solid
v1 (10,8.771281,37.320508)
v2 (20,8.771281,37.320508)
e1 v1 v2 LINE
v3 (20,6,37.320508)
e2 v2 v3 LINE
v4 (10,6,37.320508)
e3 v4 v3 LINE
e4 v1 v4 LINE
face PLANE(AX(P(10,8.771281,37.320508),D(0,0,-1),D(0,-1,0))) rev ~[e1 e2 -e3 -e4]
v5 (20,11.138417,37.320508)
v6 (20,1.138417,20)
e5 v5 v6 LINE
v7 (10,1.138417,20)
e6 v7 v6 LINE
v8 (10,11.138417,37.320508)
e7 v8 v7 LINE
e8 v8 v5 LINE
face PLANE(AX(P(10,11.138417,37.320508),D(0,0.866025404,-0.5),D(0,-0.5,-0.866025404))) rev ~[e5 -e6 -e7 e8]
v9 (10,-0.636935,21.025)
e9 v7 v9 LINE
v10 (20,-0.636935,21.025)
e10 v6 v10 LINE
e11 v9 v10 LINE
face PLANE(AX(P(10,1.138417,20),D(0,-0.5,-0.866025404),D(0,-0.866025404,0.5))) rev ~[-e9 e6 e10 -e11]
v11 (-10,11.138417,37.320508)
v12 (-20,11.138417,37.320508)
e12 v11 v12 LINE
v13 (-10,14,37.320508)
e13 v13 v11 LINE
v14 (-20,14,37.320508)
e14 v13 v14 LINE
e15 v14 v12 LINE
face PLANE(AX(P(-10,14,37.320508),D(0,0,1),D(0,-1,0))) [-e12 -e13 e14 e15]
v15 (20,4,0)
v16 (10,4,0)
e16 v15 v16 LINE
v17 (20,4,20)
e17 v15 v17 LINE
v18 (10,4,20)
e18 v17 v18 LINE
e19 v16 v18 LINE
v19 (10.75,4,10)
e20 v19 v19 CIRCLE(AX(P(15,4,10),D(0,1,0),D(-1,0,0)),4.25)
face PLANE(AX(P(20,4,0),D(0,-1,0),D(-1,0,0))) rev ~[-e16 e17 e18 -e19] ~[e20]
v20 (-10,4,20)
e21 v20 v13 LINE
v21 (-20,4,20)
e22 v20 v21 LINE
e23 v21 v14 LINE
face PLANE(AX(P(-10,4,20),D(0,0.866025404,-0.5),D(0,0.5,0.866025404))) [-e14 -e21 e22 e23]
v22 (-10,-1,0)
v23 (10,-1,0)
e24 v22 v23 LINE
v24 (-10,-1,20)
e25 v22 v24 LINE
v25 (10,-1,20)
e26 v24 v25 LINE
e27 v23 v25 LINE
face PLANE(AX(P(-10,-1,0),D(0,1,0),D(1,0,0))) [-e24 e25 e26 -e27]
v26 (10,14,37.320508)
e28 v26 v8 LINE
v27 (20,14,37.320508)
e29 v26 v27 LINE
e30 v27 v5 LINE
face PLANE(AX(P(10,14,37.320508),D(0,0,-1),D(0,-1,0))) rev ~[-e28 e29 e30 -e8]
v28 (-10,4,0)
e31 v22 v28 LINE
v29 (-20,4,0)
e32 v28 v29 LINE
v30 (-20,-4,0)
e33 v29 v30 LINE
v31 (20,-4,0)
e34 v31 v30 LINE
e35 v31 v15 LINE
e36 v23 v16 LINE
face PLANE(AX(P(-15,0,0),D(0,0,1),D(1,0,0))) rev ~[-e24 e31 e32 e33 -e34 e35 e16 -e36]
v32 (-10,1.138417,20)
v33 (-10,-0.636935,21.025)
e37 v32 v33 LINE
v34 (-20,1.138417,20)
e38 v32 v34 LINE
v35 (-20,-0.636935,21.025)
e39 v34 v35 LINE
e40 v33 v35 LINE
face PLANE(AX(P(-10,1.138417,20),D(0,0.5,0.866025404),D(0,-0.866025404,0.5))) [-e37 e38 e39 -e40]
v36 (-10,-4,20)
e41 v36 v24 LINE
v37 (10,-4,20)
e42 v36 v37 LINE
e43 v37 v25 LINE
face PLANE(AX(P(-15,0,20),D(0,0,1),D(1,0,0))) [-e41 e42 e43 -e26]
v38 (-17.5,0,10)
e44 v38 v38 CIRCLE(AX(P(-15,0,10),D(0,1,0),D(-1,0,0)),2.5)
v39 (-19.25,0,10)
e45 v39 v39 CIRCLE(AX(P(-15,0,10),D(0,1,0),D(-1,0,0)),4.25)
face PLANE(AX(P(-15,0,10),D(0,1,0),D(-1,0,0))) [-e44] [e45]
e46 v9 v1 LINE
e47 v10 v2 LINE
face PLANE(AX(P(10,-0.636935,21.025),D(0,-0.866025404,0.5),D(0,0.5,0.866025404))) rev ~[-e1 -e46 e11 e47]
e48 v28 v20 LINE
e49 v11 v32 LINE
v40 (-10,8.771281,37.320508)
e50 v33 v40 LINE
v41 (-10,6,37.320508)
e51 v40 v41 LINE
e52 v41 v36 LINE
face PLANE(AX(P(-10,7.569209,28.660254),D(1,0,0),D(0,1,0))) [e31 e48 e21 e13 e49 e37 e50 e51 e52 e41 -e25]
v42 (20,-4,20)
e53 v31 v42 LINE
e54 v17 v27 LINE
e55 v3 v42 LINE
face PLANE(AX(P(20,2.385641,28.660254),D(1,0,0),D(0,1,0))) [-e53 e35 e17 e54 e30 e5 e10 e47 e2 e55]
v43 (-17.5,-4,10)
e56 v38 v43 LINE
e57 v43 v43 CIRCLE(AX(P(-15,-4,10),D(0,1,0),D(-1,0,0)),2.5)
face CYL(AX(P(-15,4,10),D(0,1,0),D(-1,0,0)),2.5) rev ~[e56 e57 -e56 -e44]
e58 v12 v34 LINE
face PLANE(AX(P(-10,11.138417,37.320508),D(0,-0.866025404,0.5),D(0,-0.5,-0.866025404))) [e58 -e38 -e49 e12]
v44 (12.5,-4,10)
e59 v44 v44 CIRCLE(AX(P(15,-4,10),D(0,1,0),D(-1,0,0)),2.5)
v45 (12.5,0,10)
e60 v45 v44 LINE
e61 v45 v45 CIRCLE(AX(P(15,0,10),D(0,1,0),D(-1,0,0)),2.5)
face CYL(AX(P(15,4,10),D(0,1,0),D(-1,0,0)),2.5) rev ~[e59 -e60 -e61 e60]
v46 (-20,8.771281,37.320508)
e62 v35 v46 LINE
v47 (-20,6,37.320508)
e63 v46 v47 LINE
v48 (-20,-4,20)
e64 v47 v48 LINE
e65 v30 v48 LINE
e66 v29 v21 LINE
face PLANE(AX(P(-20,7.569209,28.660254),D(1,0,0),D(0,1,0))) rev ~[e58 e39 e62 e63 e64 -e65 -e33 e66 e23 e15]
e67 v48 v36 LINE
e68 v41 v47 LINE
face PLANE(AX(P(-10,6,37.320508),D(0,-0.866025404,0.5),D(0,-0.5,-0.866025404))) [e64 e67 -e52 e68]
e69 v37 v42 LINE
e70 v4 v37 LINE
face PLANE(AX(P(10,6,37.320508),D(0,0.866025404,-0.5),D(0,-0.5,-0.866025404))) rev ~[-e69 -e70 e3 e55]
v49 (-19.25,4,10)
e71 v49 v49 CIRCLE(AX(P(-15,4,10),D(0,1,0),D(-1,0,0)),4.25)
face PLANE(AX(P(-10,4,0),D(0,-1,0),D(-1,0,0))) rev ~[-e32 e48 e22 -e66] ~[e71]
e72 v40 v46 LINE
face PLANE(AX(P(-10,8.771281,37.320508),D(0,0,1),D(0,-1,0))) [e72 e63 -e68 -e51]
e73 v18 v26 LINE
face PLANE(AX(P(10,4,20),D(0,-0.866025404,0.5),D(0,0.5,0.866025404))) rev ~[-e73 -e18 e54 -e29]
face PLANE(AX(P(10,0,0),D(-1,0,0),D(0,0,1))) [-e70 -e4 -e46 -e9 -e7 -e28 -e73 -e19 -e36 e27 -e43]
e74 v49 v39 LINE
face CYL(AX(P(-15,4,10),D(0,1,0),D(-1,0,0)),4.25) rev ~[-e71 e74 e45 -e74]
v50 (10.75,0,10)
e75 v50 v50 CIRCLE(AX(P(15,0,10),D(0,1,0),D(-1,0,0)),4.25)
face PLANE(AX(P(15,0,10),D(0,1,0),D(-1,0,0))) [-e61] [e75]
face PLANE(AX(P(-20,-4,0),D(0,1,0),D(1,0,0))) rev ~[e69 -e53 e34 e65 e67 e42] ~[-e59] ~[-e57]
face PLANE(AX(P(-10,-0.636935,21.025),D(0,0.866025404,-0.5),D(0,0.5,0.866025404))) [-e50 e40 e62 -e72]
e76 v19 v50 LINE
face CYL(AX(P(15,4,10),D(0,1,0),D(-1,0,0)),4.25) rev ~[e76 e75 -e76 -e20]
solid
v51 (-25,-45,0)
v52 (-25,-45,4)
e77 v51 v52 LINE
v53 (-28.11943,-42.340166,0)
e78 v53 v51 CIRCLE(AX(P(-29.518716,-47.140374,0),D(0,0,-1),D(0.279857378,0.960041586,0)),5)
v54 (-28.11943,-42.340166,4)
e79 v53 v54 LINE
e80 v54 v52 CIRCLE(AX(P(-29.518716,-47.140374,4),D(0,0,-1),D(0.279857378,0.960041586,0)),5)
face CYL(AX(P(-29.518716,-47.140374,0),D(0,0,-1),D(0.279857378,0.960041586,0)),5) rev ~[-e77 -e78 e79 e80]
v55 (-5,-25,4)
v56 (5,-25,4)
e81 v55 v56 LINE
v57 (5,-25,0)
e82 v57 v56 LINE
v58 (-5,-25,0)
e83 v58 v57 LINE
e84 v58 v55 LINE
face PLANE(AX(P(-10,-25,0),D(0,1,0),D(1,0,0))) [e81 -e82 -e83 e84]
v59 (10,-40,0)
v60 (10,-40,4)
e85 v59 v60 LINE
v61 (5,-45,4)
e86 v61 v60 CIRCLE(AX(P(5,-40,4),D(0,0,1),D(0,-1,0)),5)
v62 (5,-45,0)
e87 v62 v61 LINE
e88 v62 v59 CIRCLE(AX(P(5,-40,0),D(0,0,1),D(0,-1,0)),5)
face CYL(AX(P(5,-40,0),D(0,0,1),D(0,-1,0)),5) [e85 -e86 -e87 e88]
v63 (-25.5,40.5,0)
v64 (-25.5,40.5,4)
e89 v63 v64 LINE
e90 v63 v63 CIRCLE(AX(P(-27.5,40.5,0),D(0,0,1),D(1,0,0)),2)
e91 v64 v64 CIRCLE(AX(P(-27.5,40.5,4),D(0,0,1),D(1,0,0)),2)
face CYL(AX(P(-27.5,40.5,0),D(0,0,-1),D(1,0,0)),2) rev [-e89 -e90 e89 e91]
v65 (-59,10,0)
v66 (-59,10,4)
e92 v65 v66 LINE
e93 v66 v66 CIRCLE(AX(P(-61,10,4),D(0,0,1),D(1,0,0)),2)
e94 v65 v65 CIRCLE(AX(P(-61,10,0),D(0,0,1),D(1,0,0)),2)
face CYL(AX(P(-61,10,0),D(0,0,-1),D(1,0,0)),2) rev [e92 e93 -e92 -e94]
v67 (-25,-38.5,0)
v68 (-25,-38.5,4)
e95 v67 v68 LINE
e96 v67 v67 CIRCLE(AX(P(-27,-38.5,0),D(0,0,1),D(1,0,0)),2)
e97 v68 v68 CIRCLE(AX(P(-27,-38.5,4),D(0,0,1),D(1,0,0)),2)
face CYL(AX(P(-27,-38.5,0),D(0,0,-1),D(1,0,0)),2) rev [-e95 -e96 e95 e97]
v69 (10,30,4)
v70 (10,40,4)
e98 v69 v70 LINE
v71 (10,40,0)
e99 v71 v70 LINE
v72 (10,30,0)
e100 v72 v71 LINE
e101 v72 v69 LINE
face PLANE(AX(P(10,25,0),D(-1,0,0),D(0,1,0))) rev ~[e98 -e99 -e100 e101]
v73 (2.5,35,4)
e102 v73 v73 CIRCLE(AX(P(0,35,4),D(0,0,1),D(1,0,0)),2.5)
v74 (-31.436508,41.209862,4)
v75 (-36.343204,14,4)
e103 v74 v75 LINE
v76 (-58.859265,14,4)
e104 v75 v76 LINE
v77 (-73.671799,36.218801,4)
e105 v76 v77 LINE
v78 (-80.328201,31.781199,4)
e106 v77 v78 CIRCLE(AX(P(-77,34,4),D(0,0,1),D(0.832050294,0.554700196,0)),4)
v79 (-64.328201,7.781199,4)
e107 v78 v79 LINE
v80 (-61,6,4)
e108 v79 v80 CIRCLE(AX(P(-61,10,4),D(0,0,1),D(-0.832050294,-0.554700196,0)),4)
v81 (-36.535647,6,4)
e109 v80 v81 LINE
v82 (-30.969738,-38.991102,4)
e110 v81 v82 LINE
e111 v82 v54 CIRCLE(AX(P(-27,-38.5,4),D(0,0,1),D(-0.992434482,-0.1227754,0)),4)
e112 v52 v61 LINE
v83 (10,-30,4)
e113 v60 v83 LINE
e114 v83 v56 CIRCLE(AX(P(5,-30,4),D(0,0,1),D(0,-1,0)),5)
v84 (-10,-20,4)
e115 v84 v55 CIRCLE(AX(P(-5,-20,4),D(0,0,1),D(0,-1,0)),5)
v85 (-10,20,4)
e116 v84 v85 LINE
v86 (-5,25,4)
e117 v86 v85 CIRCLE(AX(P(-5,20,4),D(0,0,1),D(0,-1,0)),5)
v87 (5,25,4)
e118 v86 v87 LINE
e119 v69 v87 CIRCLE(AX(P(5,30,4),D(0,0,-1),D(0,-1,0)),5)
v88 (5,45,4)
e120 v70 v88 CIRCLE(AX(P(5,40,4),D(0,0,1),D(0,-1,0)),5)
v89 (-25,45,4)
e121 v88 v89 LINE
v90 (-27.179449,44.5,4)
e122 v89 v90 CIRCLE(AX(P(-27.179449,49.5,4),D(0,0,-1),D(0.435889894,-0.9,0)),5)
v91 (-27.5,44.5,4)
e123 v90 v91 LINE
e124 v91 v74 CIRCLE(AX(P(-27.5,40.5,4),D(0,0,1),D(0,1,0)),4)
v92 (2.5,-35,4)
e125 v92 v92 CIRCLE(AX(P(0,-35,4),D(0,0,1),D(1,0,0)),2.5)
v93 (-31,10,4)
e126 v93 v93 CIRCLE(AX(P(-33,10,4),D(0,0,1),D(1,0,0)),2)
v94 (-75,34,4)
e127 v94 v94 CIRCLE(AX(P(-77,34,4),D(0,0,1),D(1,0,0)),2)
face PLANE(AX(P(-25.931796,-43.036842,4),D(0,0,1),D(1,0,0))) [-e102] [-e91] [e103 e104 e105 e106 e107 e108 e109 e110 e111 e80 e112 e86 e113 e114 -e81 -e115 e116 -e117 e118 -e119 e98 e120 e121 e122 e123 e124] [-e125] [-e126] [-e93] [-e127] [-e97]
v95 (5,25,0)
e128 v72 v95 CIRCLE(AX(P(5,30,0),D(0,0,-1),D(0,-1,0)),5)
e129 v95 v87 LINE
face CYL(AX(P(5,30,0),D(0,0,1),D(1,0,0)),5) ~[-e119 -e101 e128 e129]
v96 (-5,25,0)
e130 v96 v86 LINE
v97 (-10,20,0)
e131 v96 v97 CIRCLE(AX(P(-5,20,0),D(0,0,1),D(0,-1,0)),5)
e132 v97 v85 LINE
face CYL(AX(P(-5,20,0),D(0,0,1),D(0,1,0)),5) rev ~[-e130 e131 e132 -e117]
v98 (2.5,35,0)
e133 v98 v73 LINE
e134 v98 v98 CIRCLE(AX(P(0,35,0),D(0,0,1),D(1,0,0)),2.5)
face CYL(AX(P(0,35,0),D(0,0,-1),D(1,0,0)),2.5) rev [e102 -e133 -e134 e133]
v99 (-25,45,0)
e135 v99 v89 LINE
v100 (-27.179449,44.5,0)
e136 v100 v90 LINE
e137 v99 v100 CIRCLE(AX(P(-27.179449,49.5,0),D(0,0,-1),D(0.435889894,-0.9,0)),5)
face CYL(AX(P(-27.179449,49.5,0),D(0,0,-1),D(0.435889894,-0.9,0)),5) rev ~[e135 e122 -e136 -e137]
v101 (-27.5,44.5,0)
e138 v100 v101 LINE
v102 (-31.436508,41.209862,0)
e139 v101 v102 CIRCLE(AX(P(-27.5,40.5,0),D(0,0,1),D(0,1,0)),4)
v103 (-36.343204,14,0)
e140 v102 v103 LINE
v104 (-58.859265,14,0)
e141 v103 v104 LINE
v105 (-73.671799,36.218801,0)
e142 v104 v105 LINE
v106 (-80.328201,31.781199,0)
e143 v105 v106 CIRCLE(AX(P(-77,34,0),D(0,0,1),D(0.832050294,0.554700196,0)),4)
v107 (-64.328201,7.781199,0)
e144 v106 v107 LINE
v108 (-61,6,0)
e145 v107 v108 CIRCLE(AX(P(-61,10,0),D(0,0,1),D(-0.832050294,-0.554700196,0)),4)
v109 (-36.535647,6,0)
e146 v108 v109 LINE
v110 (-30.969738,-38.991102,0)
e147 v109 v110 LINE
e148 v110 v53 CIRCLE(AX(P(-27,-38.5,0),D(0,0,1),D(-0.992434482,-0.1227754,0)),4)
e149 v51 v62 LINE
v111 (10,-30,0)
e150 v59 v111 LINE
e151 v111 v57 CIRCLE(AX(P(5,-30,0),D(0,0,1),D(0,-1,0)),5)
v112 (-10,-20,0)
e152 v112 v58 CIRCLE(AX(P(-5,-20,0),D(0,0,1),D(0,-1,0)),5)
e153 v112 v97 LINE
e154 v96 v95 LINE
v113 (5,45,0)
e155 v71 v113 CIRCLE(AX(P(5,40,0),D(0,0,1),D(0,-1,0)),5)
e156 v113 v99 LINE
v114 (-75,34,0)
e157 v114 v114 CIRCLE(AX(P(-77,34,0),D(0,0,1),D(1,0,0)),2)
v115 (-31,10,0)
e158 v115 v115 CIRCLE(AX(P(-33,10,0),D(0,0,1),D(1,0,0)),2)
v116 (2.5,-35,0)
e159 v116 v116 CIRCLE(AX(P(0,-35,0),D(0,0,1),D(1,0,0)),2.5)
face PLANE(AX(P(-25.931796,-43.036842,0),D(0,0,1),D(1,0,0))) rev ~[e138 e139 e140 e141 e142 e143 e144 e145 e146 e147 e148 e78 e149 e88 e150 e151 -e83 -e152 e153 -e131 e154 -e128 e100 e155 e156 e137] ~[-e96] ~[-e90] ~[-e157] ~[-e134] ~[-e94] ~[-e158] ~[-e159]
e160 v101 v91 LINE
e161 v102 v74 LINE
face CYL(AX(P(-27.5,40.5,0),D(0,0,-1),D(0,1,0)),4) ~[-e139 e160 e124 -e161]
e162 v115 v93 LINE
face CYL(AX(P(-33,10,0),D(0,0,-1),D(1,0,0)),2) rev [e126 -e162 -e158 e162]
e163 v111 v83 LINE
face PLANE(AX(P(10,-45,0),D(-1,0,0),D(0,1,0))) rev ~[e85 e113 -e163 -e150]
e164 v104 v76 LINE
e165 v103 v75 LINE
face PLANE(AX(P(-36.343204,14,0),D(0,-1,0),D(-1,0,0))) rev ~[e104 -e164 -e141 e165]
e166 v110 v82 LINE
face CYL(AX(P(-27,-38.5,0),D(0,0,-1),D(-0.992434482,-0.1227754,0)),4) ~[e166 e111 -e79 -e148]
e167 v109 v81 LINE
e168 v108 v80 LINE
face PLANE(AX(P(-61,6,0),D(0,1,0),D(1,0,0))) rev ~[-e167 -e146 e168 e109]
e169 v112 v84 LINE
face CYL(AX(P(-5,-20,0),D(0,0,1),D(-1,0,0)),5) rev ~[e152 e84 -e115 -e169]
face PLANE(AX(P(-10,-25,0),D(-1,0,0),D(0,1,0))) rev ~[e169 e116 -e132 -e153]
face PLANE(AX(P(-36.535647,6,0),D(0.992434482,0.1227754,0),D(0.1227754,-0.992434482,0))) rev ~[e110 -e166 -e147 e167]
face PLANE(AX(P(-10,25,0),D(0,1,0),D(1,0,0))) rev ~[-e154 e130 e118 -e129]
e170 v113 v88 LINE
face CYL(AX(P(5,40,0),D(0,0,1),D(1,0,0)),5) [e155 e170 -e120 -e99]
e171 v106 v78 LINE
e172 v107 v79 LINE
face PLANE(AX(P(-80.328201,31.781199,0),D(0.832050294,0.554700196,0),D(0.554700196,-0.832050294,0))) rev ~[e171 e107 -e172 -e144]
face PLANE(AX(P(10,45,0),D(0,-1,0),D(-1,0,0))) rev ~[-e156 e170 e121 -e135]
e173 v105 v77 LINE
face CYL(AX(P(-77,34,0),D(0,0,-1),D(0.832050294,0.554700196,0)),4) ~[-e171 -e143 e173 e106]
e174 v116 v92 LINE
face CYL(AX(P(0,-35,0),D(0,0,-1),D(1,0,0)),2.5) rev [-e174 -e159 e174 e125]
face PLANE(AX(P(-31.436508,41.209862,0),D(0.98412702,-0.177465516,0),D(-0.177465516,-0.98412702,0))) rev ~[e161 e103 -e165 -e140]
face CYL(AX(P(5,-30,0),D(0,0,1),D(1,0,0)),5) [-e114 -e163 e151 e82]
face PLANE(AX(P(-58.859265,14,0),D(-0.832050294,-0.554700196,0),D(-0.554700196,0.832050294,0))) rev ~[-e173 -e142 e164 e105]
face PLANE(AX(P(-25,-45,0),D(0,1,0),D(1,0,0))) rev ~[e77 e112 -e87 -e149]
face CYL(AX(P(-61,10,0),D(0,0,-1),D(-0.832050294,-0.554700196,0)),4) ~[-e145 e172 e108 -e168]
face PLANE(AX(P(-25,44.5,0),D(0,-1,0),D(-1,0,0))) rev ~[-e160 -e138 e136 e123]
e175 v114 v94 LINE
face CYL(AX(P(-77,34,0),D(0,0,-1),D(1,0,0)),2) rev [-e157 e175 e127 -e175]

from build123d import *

# Parameters (mm, degrees)
F0_W         = 20
F0_H         = 4
F1_DEPTH     = 20
F2_DEPTH     = 20
F4_START     = 10
F4_DEPTH     = 10
F5_START     = -10
F5_DEPTH     = 10
F6_R         = 2.5
F7_DEPTH     = 25
F6_R_2       = 4.25
F8_DEPTH     = 4
F9_DEPTH     = 1
F10_W        = 20
F10_H        = 20
F10_R        = 2.5
F10_R_2      = 2
F11_DEPTH    = 4
F12_T1_DEPTH = 4
F13_R        = 5


# Not quite as in the source:
# - a fillet or chamfer that OpenCascade refuses, or shapes differently, is made with other operations: its cross-section is extruded or revolved along the edge and cut away or added
# - ends of sketch curves that miss each other by under 0.0002 mm in the source are joined


with BuildPart() as f1:
    # F0 (on Top) → F1 (new body)
    with BuildSketch(Plane.XY):
        with Locations((0, -2)):
            Rectangle(F0_W, F0_H)
    extrude(amount=F1_DEPTH)

    # F0 (on Top) → F2 (join)
    with BuildSketch(Plane.XY):
        Polygon((-10, 4), (-20, 4), (-20, -4), (-10, -4), (-10, 0), align=None)
        Polygon((20, 4), (10, 4), (10, 0), (10, -4), (20, -4), align=None)
    extrude(amount=F2_DEPTH)

    # F3 (on Right) → F4 (join)
    with BuildSketch(Plane.YZ.offset(F4_START)):
        Polygon((-4, 20), (-1.2287187079, 20), (-0.636934682, 21.025), (8.7712812921, 37.3205080757), (6, 37.3205080757), align=None)
        Polygon((-1.2287187079, 20), (1.1384173958, 20), (-0.636934682, 21.025), align=None)
        Polygon((1.1384173958, 20), (4, 20), (14, 37.3205080757), (11.1384173958, 37.3205080757), align=None)
    extrude(amount=F4_DEPTH)

    # F3 (on Right) → F5 (join)
    with BuildSketch(Plane.YZ.offset(F5_START)):
        Polygon((1.1384173958, 20), (4, 20), (14, 37.3205080757), (11.1384173958, 37.3205080757), align=None)
        Polygon((-4, 20), (-1.2287187079, 20), (-0.636934682, 21.025), (8.7712812921, 37.3205080757), (6, 37.3205080757), align=None)
        Polygon((-1.2287187079, 20), (1.1384173958, 20), (-0.636934682, 21.025), align=None)
    extrude(amount=-F5_DEPTH)

    # F6 (on face) → F7 (cut)
    with BuildSketch(Plane(origin=(0, 4, 0), x_dir=(-1, 0, 0), z_dir=(0, 1, 0))):
        with Locations((-15, 10)):
            Circle(F6_R)
        with Locations((15, 10)):
            Circle(F6_R)
    extrude(amount=-F7_DEPTH, mode=Mode.SUBTRACT)

    # F6 (on face) → F8 (cut)
    with BuildSketch(Plane(origin=(0, 4, 0), x_dir=(-1, 0, 0), z_dir=(0, 1, 0))):
        with Locations((-15, 10)):
            Circle(F6_R_2)
        with Locations((-15, 10)):
            Circle(F6_R, mode=Mode.SUBTRACT)
        with Locations((15, 10)):
            Circle(F6_R_2)
        with Locations((15, 10)):
            Circle(F6_R, mode=Mode.SUBTRACT)
    extrude(amount=-F8_DEPTH, mode=Mode.SUBTRACT)

    # F9 (cut): a face of the model
    f9_faces = [f1.faces().sort_by_distance(p)[0] for p in [
        (0, 0, 10),
    ]]
    extrude(f9_faces, amount=-F9_DEPTH, mode=Mode.SUBTRACT)


with BuildPart() as f11:
    # F10 (on Top) → F11 (new body)
    with BuildSketch(Plane.XY):
        with Locations((0, 35)):
            Rectangle(F10_W, F10_H)
        with Locations((0, 35)):
            Circle(F10_R, mode=Mode.SUBTRACT)
        with BuildLine():
            Line((-10, 25), (-10, 45))
            Line((-10, 45), (-25, 45))
            Line((-25, 45), (-25, 44.5))
            Line((-25, 44.5), (-25, 43.6224989992))
            ThreePointArc((-25, 43.6224989992), (-23.8944487245, 42.2320508076), (-23.5, 40.5))
            ThreePointArc((-23.5, 40.5), (-23.5159046021, 40.1436520514), (-23.5634919302, 39.7901378891))
            Line((-23.5634919302, 39.7901378891), (-25, 31.8240476839))
            Line((-25, 31.8240476839), (-25, 14))
            Line((-25, 14), (-25, 6))
            Line((-25, 6), (-25, -22.0868501472))
            Line((-25, -22.0868501472), (-23.0302620717, -38.0088984006))
            ThreePointArc((-23.0302620717, -38.0088984006), (-23.0075726861, -38.2539834488), (-23, -38.5))
            ThreePointArc((-23, -38.5), (-23.5358983849, -40.5), (-25, -41.9641016151))
            Line((-25, -41.9641016151), (-25, -42.5))
            Line((-25, -42.5), (-25, -45))
            Line((-25, -45), (-10, -45))
            Line((-10, -45), (-10, -25))
            Line((-10, -25), (-10, 25))
        make_face()
        with Locations((0, -35)):
            Rectangle(F10_W, F10_H)
        with Locations((0, -35)):
            Circle(F10_R, mode=Mode.SUBTRACT)
        with BuildLine():
            Line((-36.5356474045, 6), (-30.9697379283, -38.9911015994))
            ThreePointArc((-30.9697379283, -38.9911015994), (-29.9970323987, -35.8508875446), (-27, -34.5))
            Line((-27, -34.5), (-25, -34.5))
            Line((-25, -34.5), (-25, -22.0868501472))
            Line((-25, -22.0868501472), (-28.4746618739, 6))
            Line((-28.4746618739, 6), (-33, 6))
            Line((-33, 6), (-36.5356474045, 6))
        make_face()
        Polygon((-25, 6), (-25, 14), (-28.2141725332, 14), (-28.9556634317, 9.8880959261), (-28.4746618739, 6), align=None)
        with BuildLine():
            Line((-25, -34.5), (-25, -35.0358983849))
            ThreePointArc((-25, -35.0358983849), (-23.665464799, -36.29072976), (-23.0302620717, -38.0088984006))
            Line((-23.0302620717, -38.0088984006), (-25, -22.0868501472))
            Line((-25, -22.0868501472), (-25, -34.5))
        make_face()
        with BuildLine():
            ThreePointArc((-27, -34.5), (-25.9647238196, -34.6362966948), (-25, -35.0358983849))
            Line((-25, -35.0358983849), (-25, -34.5))
            Line((-25, -34.5), (-27, -34.5))
        make_face()
        with BuildLine():
            Line((-25, -38.5), (-25, -41.9641016151))
            ThreePointArc((-25, -41.9641016151), (-23.5358983849, -40.5), (-23, -38.5))
            ThreePointArc((-23, -38.5), (-23.0075726861, -38.2539834488), (-23.0302620717, -38.0088984006))
            ThreePointArc((-23.0302620717, -38.0088984006), (-23.665464799, -36.29072976), (-25, -35.0358983849))
            Line((-25, -35.0358983849), (-25, -38.5))
        make_face()
        with BuildLine():
            ThreePointArc((-27, -42.5), (-25.9647238196, -42.3637033052), (-25, -41.9641016151))
            Line((-25, -41.9641016151), (-25, -38.5))
            Line((-25, -38.5), (-25, -35.0358983849))
            ThreePointArc((-25, -35.0358983849), (-25.9647238196, -34.6362966948), (-27, -34.5))
            ThreePointArc((-27, -34.5), (-29.9970323987, -35.8508875446), (-30.9697379283, -38.9911015994))
            ThreePointArc((-30.9697379283, -38.9911015994), (-29.6491124554, -41.4970323987), (-27, -42.5))
        make_face()
        with Locations((-27, -38.5)):
            Circle(F10_R_2, mode=Mode.SUBTRACT)
        with BuildLine():
            Line((-27, -42.5), (-25, -42.5))
            Line((-25, -42.5), (-25, -41.9641016151))
            ThreePointArc((-25, -41.9641016151), (-25.9647238196, -42.3637033052), (-27, -42.5))
        make_face()
        Polygon((-25, -22.0868501472), (-25, 6), (-28.4746618739, 6), align=None)
        Polygon((-25, 14), (-25, 31.8240476839), (-28.2141725332, 14), align=None)
        with BuildLine():
            Line((-28.4746618739, 6), (-28.9556634317, 9.8880959261))
            Line((-28.9556634317, 9.8880959261), (-29.0634919302, 9.2901378891))
            ThreePointArc((-29.0634919302, 9.2901378891), (-30.4347951781, 6.9308430764), (-33, 6))
            Line((-33, 6), (-28.4746618739, 6))
        make_face()
        with BuildLine():
            ThreePointArc((-33, 6), (-35.6491124554, 7.0029676013), (-36.9697379283, 9.5088984006))
            Line((-36.9697379283, 9.5088984006), (-36.5356474045, 6))
            Line((-36.5356474045, 6), (-33, 6))
        make_face()
        with BuildLine():
            Line((-33, 14), (-36.3432041846, 14))
            Line((-36.3432041846, 14), (-36.9365077488, 10.7098620531))
            ThreePointArc((-36.9365077488, 10.7098620531), (-35.5652048219, 13.0691569236), (-33, 14))
        make_face()
        with BuildLine():
            Line((-28.2141725332, 14), (-33, 14))
            ThreePointArc((-33, 14), (-30.3508875446, 12.9970323987), (-29.0302620717, 10.4911015994))
            Line((-29.0302620717, 10.4911015994), (-28.9556634317, 9.8880959261))
            Line((-28.9556634317, 9.8880959261), (-28.2141725332, 14))
        make_face()
        with BuildLine():
            ThreePointArc((-27.5, 36.5), (-30.5691569236, 37.9347951781), (-31.4365080698, 41.2098621109))
            Line((-31.4365080698, 41.2098621109), (-36.3432041846, 14))
            Line((-36.3432041846, 14), (-33, 14))
            Line((-33, 14), (-28.2141725332, 14))
            Line((-28.2141725332, 14), (-25, 31.8240476839))
            Line((-25, 31.8240476839), (-25, 36.5))
            Line((-25, 36.5), (-27.5, 36.5))
        make_face()
        with BuildLine():
            ThreePointArc((-23.5634919302, 39.7901378891), (-24.0630881272, 38.4536283871), (-25, 37.3775010008))
            Line((-25, 37.3775010008), (-25, 36.5))
            Line((-25, 36.5), (-25, 31.8240476839))
            Line((-25, 31.8240476839), (-23.5634919302, 39.7901378891))
        make_face()
        with BuildLine():
            Line((-25, 36.5), (-25, 37.3775010008))
            ThreePointArc((-25, 37.3775010008), (-26.1752351146, 36.7257453718), (-27.5, 36.5))
            Line((-27.5, 36.5), (-25, 36.5))
        make_face()
        with BuildLine():
            Line((-25, 37.3775010008), (-25, 43.6224989992))
            ThreePointArc((-25, 43.6224989992), (-26.1752351146, 44.2742546282), (-27.5, 44.5))
            ThreePointArc((-27.5, 44.5), (-30.0652048219, 43.5691569236), (-31.4365080698, 41.2098621109))
            ThreePointArc((-31.4365080698, 41.2098621109), (-30.5691569236, 37.9347951781), (-27.5, 36.5))
            ThreePointArc((-27.5, 36.5), (-26.1752351146, 36.7257453718), (-25, 37.3775010008))
        make_face()
        with Locations((-27.5, 40.5)):
            Circle(F10_R_2, mode=Mode.SUBTRACT)
        with BuildLine():
            ThreePointArc((-23.5, 40.5), (-23.8944487245, 42.2320508076), (-25, 43.6224989992))
            Line((-25, 43.6224989992), (-25, 37.3775010008))
            ThreePointArc((-25, 37.3775010008), (-24.0630881272, 38.4536283871), (-23.5634919302, 39.7901378891))
            ThreePointArc((-23.5634919302, 39.7901378891), (-23.5159046021, 40.1436520514), (-23.5, 40.5))
        make_face()
        with BuildLine():
            Line((-25, 43.6224989992), (-25, 44.5))
            Line((-25, 44.5), (-27.5, 44.5))
            ThreePointArc((-27.5, 44.5), (-26.1752351146, 44.2742546282), (-25, 43.6224989992))
        make_face()
        with BuildLine():
            Line((-36.9365077488, 10.7098620531), (-36.3432041846, 14))
            Line((-36.3432041846, 14), (-58.859264966, 14))
            Line((-58.859264966, 14), (-57.6717988226, 12.2188007849))
            ThreePointArc((-57.6717988226, 12.2188007849), (-57.171631894, 11.1591365948), (-57, 10))
            ThreePointArc((-57, 10), (-58.1715728753, 7.1715728753), (-61, 6))
            Line((-61, 6), (-36.5356474045, 6))
            Line((-36.5356474045, 6), (-36.9697379283, 9.5088984006))
            ThreePointArc((-36.9697379283, 9.5088984006), (-36.9984696952, 10.1106349684), (-36.9365077488, 10.7098620531))
        make_face()
        with BuildLine():
            ThreePointArc((-57, 10), (-57.171631894, 11.1591365948), (-57.6717988226, 12.2188007849))
            ThreePointArc((-57.6717988226, 12.2188007849), (-59.1125682979, 13.5266983951), (-61, 14))
            ThreePointArc((-61, 14), (-64.5266983951, 11.8874317021), (-64.3282011774, 7.7811992151))
            ThreePointArc((-64.3282011774, 7.7811992151), (-62.8874317021, 6.4733016049), (-61, 6))
            ThreePointArc((-61, 6), (-58.1715728753, 7.1715728753), (-57, 10))
        make_face()
        with Locations((-61, 10)):
            Circle(F10_R_2, mode=Mode.SUBTRACT)
        with BuildLine():
            Line((-57.6717988226, 12.2188007849), (-58.859264966, 14))
            Line((-58.859264966, 14), (-61, 14))
            ThreePointArc((-61, 14), (-59.1125682979, 13.5266983951), (-57.6717988226, 12.2188007849))
        make_face()
        with BuildLine():
            Line((-61, 14), (-58.859264966, 14))
            Line((-58.859264966, 14), (-73.6717988226, 36.2188007849))
            ThreePointArc((-73.6717988226, 36.2188007849), (-73.171631894, 35.1591365948), (-73, 34))
            ThreePointArc((-73, 34), (-75.8408634052, 30.171631894), (-80.3282011774, 31.7811992151))
            Line((-80.3282011774, 31.7811992151), (-64.3282011774, 7.7811992151))
            ThreePointArc((-64.3282011774, 7.7811992151), (-64.5266983951, 11.8874317021), (-61, 14))
        make_face()
        with BuildLine():
            ThreePointArc((-73, 34), (-73.171631894, 35.1591365948), (-73.6717988226, 36.2188007849))
            ThreePointArc((-73.6717988226, 36.2188007849), (-79.2188007849, 37.3282011774), (-80.3282011774, 31.7811992151))
            ThreePointArc((-80.3282011774, 31.7811992151), (-75.8408634052, 30.171631894), (-73, 34))
        make_face()
        with Locations((-77, 34)):
            Circle(F10_R_2, mode=Mode.SUBTRACT)
        with BuildLine():
            ThreePointArc((-33, 14), (-35.5652048219, 13.0691569236), (-36.9365080698, 10.7098621109))
            ThreePointArc((-36.9365080698, 10.7098621109), (-36.9984696952, 10.1106349684), (-36.9697379283, 9.5088984006))
            ThreePointArc((-36.9697379283, 9.5088984006), (-35.6491124554, 7.0029676013), (-33, 6))
            ThreePointArc((-33, 6), (-30.4347951781, 6.9308430764), (-29.0634919302, 9.2901378891))
            ThreePointArc((-29.0634919302, 9.2901378891), (-29.0159046021, 9.6436520514), (-29, 10))
            ThreePointArc((-29, 10), (-29.0075726861, 10.2460165512), (-29.0302620717, 10.4911015994))
            ThreePointArc((-29.0302620717, 10.4911015994), (-30.3508875446, 12.9970323987), (-33, 14))
        make_face()
        with Locations((-33, 10)):
            Circle(F10_R_2, mode=Mode.SUBTRACT)
        with BuildLine():
            Line((-28.9556634317, 9.8880959261), (-29.0302620717, 10.4911015994))
            ThreePointArc((-29.0302620717, 10.4911015994), (-29.0075726861, 10.2460165512), (-29, 10))
            ThreePointArc((-29, 10), (-29.0159046021, 9.6436520514), (-29.0634919302, 9.2901378891))
            Line((-29.0634919302, 9.2901378891), (-28.9556634317, 9.8880959261))
        make_face()
    extrude(amount=F11_DEPTH)

    # F12: fillet of radius 5 on 2 edges, made by hand

    # F12_s2 → F12_t1 (join)
    with BuildSketch(Plane.XY):
        with BuildLine():
            ThreePointArc((-28.1194295133, -42.340166346), (-26.2745879363, -43.335688946), (-25, -45))
            Line((-25, -45), (-24.5481283595, -44.7859625722))
            ThreePointArc((-24.5481283595, -44.7859625722), (-24.5, -43.75), (-24.5, -42.5))
            Line((-24.5, -42.5), (-25, -42))
            ThreePointArc((-25, -42), (-27, -42), (-27.9795008241, -41.8601455527))
            Line((-27.9795008241, -41.8601455527), (-28.1194295133, -42.340166346))
        make_face()
        with BuildLine():
            ThreePointArc((-25, 45), (-26.061415483, 44.6266028276), (-27.1794494718, 44.5))
            Line((-27.1794494718, 44.5), (-25, 44.5))
            Line((-25, 44.5), (-25, 45))
        make_face()
    extrude(amount=F12_T1_DEPTH)

    # F13
    f13_edges = [f11.edges().sort_by_distance(p)[0] for p in [
        (10, 45, 2),
        (10, 25, 2),
        (-10, 25, 2),
        (-10, -25, 2),
        (10, -25, 2),
        (10, -45, 2),
    ]]
    fillet(f13_edges, radius=F13_R)


solid = Compound([f1.part, f11.part])
